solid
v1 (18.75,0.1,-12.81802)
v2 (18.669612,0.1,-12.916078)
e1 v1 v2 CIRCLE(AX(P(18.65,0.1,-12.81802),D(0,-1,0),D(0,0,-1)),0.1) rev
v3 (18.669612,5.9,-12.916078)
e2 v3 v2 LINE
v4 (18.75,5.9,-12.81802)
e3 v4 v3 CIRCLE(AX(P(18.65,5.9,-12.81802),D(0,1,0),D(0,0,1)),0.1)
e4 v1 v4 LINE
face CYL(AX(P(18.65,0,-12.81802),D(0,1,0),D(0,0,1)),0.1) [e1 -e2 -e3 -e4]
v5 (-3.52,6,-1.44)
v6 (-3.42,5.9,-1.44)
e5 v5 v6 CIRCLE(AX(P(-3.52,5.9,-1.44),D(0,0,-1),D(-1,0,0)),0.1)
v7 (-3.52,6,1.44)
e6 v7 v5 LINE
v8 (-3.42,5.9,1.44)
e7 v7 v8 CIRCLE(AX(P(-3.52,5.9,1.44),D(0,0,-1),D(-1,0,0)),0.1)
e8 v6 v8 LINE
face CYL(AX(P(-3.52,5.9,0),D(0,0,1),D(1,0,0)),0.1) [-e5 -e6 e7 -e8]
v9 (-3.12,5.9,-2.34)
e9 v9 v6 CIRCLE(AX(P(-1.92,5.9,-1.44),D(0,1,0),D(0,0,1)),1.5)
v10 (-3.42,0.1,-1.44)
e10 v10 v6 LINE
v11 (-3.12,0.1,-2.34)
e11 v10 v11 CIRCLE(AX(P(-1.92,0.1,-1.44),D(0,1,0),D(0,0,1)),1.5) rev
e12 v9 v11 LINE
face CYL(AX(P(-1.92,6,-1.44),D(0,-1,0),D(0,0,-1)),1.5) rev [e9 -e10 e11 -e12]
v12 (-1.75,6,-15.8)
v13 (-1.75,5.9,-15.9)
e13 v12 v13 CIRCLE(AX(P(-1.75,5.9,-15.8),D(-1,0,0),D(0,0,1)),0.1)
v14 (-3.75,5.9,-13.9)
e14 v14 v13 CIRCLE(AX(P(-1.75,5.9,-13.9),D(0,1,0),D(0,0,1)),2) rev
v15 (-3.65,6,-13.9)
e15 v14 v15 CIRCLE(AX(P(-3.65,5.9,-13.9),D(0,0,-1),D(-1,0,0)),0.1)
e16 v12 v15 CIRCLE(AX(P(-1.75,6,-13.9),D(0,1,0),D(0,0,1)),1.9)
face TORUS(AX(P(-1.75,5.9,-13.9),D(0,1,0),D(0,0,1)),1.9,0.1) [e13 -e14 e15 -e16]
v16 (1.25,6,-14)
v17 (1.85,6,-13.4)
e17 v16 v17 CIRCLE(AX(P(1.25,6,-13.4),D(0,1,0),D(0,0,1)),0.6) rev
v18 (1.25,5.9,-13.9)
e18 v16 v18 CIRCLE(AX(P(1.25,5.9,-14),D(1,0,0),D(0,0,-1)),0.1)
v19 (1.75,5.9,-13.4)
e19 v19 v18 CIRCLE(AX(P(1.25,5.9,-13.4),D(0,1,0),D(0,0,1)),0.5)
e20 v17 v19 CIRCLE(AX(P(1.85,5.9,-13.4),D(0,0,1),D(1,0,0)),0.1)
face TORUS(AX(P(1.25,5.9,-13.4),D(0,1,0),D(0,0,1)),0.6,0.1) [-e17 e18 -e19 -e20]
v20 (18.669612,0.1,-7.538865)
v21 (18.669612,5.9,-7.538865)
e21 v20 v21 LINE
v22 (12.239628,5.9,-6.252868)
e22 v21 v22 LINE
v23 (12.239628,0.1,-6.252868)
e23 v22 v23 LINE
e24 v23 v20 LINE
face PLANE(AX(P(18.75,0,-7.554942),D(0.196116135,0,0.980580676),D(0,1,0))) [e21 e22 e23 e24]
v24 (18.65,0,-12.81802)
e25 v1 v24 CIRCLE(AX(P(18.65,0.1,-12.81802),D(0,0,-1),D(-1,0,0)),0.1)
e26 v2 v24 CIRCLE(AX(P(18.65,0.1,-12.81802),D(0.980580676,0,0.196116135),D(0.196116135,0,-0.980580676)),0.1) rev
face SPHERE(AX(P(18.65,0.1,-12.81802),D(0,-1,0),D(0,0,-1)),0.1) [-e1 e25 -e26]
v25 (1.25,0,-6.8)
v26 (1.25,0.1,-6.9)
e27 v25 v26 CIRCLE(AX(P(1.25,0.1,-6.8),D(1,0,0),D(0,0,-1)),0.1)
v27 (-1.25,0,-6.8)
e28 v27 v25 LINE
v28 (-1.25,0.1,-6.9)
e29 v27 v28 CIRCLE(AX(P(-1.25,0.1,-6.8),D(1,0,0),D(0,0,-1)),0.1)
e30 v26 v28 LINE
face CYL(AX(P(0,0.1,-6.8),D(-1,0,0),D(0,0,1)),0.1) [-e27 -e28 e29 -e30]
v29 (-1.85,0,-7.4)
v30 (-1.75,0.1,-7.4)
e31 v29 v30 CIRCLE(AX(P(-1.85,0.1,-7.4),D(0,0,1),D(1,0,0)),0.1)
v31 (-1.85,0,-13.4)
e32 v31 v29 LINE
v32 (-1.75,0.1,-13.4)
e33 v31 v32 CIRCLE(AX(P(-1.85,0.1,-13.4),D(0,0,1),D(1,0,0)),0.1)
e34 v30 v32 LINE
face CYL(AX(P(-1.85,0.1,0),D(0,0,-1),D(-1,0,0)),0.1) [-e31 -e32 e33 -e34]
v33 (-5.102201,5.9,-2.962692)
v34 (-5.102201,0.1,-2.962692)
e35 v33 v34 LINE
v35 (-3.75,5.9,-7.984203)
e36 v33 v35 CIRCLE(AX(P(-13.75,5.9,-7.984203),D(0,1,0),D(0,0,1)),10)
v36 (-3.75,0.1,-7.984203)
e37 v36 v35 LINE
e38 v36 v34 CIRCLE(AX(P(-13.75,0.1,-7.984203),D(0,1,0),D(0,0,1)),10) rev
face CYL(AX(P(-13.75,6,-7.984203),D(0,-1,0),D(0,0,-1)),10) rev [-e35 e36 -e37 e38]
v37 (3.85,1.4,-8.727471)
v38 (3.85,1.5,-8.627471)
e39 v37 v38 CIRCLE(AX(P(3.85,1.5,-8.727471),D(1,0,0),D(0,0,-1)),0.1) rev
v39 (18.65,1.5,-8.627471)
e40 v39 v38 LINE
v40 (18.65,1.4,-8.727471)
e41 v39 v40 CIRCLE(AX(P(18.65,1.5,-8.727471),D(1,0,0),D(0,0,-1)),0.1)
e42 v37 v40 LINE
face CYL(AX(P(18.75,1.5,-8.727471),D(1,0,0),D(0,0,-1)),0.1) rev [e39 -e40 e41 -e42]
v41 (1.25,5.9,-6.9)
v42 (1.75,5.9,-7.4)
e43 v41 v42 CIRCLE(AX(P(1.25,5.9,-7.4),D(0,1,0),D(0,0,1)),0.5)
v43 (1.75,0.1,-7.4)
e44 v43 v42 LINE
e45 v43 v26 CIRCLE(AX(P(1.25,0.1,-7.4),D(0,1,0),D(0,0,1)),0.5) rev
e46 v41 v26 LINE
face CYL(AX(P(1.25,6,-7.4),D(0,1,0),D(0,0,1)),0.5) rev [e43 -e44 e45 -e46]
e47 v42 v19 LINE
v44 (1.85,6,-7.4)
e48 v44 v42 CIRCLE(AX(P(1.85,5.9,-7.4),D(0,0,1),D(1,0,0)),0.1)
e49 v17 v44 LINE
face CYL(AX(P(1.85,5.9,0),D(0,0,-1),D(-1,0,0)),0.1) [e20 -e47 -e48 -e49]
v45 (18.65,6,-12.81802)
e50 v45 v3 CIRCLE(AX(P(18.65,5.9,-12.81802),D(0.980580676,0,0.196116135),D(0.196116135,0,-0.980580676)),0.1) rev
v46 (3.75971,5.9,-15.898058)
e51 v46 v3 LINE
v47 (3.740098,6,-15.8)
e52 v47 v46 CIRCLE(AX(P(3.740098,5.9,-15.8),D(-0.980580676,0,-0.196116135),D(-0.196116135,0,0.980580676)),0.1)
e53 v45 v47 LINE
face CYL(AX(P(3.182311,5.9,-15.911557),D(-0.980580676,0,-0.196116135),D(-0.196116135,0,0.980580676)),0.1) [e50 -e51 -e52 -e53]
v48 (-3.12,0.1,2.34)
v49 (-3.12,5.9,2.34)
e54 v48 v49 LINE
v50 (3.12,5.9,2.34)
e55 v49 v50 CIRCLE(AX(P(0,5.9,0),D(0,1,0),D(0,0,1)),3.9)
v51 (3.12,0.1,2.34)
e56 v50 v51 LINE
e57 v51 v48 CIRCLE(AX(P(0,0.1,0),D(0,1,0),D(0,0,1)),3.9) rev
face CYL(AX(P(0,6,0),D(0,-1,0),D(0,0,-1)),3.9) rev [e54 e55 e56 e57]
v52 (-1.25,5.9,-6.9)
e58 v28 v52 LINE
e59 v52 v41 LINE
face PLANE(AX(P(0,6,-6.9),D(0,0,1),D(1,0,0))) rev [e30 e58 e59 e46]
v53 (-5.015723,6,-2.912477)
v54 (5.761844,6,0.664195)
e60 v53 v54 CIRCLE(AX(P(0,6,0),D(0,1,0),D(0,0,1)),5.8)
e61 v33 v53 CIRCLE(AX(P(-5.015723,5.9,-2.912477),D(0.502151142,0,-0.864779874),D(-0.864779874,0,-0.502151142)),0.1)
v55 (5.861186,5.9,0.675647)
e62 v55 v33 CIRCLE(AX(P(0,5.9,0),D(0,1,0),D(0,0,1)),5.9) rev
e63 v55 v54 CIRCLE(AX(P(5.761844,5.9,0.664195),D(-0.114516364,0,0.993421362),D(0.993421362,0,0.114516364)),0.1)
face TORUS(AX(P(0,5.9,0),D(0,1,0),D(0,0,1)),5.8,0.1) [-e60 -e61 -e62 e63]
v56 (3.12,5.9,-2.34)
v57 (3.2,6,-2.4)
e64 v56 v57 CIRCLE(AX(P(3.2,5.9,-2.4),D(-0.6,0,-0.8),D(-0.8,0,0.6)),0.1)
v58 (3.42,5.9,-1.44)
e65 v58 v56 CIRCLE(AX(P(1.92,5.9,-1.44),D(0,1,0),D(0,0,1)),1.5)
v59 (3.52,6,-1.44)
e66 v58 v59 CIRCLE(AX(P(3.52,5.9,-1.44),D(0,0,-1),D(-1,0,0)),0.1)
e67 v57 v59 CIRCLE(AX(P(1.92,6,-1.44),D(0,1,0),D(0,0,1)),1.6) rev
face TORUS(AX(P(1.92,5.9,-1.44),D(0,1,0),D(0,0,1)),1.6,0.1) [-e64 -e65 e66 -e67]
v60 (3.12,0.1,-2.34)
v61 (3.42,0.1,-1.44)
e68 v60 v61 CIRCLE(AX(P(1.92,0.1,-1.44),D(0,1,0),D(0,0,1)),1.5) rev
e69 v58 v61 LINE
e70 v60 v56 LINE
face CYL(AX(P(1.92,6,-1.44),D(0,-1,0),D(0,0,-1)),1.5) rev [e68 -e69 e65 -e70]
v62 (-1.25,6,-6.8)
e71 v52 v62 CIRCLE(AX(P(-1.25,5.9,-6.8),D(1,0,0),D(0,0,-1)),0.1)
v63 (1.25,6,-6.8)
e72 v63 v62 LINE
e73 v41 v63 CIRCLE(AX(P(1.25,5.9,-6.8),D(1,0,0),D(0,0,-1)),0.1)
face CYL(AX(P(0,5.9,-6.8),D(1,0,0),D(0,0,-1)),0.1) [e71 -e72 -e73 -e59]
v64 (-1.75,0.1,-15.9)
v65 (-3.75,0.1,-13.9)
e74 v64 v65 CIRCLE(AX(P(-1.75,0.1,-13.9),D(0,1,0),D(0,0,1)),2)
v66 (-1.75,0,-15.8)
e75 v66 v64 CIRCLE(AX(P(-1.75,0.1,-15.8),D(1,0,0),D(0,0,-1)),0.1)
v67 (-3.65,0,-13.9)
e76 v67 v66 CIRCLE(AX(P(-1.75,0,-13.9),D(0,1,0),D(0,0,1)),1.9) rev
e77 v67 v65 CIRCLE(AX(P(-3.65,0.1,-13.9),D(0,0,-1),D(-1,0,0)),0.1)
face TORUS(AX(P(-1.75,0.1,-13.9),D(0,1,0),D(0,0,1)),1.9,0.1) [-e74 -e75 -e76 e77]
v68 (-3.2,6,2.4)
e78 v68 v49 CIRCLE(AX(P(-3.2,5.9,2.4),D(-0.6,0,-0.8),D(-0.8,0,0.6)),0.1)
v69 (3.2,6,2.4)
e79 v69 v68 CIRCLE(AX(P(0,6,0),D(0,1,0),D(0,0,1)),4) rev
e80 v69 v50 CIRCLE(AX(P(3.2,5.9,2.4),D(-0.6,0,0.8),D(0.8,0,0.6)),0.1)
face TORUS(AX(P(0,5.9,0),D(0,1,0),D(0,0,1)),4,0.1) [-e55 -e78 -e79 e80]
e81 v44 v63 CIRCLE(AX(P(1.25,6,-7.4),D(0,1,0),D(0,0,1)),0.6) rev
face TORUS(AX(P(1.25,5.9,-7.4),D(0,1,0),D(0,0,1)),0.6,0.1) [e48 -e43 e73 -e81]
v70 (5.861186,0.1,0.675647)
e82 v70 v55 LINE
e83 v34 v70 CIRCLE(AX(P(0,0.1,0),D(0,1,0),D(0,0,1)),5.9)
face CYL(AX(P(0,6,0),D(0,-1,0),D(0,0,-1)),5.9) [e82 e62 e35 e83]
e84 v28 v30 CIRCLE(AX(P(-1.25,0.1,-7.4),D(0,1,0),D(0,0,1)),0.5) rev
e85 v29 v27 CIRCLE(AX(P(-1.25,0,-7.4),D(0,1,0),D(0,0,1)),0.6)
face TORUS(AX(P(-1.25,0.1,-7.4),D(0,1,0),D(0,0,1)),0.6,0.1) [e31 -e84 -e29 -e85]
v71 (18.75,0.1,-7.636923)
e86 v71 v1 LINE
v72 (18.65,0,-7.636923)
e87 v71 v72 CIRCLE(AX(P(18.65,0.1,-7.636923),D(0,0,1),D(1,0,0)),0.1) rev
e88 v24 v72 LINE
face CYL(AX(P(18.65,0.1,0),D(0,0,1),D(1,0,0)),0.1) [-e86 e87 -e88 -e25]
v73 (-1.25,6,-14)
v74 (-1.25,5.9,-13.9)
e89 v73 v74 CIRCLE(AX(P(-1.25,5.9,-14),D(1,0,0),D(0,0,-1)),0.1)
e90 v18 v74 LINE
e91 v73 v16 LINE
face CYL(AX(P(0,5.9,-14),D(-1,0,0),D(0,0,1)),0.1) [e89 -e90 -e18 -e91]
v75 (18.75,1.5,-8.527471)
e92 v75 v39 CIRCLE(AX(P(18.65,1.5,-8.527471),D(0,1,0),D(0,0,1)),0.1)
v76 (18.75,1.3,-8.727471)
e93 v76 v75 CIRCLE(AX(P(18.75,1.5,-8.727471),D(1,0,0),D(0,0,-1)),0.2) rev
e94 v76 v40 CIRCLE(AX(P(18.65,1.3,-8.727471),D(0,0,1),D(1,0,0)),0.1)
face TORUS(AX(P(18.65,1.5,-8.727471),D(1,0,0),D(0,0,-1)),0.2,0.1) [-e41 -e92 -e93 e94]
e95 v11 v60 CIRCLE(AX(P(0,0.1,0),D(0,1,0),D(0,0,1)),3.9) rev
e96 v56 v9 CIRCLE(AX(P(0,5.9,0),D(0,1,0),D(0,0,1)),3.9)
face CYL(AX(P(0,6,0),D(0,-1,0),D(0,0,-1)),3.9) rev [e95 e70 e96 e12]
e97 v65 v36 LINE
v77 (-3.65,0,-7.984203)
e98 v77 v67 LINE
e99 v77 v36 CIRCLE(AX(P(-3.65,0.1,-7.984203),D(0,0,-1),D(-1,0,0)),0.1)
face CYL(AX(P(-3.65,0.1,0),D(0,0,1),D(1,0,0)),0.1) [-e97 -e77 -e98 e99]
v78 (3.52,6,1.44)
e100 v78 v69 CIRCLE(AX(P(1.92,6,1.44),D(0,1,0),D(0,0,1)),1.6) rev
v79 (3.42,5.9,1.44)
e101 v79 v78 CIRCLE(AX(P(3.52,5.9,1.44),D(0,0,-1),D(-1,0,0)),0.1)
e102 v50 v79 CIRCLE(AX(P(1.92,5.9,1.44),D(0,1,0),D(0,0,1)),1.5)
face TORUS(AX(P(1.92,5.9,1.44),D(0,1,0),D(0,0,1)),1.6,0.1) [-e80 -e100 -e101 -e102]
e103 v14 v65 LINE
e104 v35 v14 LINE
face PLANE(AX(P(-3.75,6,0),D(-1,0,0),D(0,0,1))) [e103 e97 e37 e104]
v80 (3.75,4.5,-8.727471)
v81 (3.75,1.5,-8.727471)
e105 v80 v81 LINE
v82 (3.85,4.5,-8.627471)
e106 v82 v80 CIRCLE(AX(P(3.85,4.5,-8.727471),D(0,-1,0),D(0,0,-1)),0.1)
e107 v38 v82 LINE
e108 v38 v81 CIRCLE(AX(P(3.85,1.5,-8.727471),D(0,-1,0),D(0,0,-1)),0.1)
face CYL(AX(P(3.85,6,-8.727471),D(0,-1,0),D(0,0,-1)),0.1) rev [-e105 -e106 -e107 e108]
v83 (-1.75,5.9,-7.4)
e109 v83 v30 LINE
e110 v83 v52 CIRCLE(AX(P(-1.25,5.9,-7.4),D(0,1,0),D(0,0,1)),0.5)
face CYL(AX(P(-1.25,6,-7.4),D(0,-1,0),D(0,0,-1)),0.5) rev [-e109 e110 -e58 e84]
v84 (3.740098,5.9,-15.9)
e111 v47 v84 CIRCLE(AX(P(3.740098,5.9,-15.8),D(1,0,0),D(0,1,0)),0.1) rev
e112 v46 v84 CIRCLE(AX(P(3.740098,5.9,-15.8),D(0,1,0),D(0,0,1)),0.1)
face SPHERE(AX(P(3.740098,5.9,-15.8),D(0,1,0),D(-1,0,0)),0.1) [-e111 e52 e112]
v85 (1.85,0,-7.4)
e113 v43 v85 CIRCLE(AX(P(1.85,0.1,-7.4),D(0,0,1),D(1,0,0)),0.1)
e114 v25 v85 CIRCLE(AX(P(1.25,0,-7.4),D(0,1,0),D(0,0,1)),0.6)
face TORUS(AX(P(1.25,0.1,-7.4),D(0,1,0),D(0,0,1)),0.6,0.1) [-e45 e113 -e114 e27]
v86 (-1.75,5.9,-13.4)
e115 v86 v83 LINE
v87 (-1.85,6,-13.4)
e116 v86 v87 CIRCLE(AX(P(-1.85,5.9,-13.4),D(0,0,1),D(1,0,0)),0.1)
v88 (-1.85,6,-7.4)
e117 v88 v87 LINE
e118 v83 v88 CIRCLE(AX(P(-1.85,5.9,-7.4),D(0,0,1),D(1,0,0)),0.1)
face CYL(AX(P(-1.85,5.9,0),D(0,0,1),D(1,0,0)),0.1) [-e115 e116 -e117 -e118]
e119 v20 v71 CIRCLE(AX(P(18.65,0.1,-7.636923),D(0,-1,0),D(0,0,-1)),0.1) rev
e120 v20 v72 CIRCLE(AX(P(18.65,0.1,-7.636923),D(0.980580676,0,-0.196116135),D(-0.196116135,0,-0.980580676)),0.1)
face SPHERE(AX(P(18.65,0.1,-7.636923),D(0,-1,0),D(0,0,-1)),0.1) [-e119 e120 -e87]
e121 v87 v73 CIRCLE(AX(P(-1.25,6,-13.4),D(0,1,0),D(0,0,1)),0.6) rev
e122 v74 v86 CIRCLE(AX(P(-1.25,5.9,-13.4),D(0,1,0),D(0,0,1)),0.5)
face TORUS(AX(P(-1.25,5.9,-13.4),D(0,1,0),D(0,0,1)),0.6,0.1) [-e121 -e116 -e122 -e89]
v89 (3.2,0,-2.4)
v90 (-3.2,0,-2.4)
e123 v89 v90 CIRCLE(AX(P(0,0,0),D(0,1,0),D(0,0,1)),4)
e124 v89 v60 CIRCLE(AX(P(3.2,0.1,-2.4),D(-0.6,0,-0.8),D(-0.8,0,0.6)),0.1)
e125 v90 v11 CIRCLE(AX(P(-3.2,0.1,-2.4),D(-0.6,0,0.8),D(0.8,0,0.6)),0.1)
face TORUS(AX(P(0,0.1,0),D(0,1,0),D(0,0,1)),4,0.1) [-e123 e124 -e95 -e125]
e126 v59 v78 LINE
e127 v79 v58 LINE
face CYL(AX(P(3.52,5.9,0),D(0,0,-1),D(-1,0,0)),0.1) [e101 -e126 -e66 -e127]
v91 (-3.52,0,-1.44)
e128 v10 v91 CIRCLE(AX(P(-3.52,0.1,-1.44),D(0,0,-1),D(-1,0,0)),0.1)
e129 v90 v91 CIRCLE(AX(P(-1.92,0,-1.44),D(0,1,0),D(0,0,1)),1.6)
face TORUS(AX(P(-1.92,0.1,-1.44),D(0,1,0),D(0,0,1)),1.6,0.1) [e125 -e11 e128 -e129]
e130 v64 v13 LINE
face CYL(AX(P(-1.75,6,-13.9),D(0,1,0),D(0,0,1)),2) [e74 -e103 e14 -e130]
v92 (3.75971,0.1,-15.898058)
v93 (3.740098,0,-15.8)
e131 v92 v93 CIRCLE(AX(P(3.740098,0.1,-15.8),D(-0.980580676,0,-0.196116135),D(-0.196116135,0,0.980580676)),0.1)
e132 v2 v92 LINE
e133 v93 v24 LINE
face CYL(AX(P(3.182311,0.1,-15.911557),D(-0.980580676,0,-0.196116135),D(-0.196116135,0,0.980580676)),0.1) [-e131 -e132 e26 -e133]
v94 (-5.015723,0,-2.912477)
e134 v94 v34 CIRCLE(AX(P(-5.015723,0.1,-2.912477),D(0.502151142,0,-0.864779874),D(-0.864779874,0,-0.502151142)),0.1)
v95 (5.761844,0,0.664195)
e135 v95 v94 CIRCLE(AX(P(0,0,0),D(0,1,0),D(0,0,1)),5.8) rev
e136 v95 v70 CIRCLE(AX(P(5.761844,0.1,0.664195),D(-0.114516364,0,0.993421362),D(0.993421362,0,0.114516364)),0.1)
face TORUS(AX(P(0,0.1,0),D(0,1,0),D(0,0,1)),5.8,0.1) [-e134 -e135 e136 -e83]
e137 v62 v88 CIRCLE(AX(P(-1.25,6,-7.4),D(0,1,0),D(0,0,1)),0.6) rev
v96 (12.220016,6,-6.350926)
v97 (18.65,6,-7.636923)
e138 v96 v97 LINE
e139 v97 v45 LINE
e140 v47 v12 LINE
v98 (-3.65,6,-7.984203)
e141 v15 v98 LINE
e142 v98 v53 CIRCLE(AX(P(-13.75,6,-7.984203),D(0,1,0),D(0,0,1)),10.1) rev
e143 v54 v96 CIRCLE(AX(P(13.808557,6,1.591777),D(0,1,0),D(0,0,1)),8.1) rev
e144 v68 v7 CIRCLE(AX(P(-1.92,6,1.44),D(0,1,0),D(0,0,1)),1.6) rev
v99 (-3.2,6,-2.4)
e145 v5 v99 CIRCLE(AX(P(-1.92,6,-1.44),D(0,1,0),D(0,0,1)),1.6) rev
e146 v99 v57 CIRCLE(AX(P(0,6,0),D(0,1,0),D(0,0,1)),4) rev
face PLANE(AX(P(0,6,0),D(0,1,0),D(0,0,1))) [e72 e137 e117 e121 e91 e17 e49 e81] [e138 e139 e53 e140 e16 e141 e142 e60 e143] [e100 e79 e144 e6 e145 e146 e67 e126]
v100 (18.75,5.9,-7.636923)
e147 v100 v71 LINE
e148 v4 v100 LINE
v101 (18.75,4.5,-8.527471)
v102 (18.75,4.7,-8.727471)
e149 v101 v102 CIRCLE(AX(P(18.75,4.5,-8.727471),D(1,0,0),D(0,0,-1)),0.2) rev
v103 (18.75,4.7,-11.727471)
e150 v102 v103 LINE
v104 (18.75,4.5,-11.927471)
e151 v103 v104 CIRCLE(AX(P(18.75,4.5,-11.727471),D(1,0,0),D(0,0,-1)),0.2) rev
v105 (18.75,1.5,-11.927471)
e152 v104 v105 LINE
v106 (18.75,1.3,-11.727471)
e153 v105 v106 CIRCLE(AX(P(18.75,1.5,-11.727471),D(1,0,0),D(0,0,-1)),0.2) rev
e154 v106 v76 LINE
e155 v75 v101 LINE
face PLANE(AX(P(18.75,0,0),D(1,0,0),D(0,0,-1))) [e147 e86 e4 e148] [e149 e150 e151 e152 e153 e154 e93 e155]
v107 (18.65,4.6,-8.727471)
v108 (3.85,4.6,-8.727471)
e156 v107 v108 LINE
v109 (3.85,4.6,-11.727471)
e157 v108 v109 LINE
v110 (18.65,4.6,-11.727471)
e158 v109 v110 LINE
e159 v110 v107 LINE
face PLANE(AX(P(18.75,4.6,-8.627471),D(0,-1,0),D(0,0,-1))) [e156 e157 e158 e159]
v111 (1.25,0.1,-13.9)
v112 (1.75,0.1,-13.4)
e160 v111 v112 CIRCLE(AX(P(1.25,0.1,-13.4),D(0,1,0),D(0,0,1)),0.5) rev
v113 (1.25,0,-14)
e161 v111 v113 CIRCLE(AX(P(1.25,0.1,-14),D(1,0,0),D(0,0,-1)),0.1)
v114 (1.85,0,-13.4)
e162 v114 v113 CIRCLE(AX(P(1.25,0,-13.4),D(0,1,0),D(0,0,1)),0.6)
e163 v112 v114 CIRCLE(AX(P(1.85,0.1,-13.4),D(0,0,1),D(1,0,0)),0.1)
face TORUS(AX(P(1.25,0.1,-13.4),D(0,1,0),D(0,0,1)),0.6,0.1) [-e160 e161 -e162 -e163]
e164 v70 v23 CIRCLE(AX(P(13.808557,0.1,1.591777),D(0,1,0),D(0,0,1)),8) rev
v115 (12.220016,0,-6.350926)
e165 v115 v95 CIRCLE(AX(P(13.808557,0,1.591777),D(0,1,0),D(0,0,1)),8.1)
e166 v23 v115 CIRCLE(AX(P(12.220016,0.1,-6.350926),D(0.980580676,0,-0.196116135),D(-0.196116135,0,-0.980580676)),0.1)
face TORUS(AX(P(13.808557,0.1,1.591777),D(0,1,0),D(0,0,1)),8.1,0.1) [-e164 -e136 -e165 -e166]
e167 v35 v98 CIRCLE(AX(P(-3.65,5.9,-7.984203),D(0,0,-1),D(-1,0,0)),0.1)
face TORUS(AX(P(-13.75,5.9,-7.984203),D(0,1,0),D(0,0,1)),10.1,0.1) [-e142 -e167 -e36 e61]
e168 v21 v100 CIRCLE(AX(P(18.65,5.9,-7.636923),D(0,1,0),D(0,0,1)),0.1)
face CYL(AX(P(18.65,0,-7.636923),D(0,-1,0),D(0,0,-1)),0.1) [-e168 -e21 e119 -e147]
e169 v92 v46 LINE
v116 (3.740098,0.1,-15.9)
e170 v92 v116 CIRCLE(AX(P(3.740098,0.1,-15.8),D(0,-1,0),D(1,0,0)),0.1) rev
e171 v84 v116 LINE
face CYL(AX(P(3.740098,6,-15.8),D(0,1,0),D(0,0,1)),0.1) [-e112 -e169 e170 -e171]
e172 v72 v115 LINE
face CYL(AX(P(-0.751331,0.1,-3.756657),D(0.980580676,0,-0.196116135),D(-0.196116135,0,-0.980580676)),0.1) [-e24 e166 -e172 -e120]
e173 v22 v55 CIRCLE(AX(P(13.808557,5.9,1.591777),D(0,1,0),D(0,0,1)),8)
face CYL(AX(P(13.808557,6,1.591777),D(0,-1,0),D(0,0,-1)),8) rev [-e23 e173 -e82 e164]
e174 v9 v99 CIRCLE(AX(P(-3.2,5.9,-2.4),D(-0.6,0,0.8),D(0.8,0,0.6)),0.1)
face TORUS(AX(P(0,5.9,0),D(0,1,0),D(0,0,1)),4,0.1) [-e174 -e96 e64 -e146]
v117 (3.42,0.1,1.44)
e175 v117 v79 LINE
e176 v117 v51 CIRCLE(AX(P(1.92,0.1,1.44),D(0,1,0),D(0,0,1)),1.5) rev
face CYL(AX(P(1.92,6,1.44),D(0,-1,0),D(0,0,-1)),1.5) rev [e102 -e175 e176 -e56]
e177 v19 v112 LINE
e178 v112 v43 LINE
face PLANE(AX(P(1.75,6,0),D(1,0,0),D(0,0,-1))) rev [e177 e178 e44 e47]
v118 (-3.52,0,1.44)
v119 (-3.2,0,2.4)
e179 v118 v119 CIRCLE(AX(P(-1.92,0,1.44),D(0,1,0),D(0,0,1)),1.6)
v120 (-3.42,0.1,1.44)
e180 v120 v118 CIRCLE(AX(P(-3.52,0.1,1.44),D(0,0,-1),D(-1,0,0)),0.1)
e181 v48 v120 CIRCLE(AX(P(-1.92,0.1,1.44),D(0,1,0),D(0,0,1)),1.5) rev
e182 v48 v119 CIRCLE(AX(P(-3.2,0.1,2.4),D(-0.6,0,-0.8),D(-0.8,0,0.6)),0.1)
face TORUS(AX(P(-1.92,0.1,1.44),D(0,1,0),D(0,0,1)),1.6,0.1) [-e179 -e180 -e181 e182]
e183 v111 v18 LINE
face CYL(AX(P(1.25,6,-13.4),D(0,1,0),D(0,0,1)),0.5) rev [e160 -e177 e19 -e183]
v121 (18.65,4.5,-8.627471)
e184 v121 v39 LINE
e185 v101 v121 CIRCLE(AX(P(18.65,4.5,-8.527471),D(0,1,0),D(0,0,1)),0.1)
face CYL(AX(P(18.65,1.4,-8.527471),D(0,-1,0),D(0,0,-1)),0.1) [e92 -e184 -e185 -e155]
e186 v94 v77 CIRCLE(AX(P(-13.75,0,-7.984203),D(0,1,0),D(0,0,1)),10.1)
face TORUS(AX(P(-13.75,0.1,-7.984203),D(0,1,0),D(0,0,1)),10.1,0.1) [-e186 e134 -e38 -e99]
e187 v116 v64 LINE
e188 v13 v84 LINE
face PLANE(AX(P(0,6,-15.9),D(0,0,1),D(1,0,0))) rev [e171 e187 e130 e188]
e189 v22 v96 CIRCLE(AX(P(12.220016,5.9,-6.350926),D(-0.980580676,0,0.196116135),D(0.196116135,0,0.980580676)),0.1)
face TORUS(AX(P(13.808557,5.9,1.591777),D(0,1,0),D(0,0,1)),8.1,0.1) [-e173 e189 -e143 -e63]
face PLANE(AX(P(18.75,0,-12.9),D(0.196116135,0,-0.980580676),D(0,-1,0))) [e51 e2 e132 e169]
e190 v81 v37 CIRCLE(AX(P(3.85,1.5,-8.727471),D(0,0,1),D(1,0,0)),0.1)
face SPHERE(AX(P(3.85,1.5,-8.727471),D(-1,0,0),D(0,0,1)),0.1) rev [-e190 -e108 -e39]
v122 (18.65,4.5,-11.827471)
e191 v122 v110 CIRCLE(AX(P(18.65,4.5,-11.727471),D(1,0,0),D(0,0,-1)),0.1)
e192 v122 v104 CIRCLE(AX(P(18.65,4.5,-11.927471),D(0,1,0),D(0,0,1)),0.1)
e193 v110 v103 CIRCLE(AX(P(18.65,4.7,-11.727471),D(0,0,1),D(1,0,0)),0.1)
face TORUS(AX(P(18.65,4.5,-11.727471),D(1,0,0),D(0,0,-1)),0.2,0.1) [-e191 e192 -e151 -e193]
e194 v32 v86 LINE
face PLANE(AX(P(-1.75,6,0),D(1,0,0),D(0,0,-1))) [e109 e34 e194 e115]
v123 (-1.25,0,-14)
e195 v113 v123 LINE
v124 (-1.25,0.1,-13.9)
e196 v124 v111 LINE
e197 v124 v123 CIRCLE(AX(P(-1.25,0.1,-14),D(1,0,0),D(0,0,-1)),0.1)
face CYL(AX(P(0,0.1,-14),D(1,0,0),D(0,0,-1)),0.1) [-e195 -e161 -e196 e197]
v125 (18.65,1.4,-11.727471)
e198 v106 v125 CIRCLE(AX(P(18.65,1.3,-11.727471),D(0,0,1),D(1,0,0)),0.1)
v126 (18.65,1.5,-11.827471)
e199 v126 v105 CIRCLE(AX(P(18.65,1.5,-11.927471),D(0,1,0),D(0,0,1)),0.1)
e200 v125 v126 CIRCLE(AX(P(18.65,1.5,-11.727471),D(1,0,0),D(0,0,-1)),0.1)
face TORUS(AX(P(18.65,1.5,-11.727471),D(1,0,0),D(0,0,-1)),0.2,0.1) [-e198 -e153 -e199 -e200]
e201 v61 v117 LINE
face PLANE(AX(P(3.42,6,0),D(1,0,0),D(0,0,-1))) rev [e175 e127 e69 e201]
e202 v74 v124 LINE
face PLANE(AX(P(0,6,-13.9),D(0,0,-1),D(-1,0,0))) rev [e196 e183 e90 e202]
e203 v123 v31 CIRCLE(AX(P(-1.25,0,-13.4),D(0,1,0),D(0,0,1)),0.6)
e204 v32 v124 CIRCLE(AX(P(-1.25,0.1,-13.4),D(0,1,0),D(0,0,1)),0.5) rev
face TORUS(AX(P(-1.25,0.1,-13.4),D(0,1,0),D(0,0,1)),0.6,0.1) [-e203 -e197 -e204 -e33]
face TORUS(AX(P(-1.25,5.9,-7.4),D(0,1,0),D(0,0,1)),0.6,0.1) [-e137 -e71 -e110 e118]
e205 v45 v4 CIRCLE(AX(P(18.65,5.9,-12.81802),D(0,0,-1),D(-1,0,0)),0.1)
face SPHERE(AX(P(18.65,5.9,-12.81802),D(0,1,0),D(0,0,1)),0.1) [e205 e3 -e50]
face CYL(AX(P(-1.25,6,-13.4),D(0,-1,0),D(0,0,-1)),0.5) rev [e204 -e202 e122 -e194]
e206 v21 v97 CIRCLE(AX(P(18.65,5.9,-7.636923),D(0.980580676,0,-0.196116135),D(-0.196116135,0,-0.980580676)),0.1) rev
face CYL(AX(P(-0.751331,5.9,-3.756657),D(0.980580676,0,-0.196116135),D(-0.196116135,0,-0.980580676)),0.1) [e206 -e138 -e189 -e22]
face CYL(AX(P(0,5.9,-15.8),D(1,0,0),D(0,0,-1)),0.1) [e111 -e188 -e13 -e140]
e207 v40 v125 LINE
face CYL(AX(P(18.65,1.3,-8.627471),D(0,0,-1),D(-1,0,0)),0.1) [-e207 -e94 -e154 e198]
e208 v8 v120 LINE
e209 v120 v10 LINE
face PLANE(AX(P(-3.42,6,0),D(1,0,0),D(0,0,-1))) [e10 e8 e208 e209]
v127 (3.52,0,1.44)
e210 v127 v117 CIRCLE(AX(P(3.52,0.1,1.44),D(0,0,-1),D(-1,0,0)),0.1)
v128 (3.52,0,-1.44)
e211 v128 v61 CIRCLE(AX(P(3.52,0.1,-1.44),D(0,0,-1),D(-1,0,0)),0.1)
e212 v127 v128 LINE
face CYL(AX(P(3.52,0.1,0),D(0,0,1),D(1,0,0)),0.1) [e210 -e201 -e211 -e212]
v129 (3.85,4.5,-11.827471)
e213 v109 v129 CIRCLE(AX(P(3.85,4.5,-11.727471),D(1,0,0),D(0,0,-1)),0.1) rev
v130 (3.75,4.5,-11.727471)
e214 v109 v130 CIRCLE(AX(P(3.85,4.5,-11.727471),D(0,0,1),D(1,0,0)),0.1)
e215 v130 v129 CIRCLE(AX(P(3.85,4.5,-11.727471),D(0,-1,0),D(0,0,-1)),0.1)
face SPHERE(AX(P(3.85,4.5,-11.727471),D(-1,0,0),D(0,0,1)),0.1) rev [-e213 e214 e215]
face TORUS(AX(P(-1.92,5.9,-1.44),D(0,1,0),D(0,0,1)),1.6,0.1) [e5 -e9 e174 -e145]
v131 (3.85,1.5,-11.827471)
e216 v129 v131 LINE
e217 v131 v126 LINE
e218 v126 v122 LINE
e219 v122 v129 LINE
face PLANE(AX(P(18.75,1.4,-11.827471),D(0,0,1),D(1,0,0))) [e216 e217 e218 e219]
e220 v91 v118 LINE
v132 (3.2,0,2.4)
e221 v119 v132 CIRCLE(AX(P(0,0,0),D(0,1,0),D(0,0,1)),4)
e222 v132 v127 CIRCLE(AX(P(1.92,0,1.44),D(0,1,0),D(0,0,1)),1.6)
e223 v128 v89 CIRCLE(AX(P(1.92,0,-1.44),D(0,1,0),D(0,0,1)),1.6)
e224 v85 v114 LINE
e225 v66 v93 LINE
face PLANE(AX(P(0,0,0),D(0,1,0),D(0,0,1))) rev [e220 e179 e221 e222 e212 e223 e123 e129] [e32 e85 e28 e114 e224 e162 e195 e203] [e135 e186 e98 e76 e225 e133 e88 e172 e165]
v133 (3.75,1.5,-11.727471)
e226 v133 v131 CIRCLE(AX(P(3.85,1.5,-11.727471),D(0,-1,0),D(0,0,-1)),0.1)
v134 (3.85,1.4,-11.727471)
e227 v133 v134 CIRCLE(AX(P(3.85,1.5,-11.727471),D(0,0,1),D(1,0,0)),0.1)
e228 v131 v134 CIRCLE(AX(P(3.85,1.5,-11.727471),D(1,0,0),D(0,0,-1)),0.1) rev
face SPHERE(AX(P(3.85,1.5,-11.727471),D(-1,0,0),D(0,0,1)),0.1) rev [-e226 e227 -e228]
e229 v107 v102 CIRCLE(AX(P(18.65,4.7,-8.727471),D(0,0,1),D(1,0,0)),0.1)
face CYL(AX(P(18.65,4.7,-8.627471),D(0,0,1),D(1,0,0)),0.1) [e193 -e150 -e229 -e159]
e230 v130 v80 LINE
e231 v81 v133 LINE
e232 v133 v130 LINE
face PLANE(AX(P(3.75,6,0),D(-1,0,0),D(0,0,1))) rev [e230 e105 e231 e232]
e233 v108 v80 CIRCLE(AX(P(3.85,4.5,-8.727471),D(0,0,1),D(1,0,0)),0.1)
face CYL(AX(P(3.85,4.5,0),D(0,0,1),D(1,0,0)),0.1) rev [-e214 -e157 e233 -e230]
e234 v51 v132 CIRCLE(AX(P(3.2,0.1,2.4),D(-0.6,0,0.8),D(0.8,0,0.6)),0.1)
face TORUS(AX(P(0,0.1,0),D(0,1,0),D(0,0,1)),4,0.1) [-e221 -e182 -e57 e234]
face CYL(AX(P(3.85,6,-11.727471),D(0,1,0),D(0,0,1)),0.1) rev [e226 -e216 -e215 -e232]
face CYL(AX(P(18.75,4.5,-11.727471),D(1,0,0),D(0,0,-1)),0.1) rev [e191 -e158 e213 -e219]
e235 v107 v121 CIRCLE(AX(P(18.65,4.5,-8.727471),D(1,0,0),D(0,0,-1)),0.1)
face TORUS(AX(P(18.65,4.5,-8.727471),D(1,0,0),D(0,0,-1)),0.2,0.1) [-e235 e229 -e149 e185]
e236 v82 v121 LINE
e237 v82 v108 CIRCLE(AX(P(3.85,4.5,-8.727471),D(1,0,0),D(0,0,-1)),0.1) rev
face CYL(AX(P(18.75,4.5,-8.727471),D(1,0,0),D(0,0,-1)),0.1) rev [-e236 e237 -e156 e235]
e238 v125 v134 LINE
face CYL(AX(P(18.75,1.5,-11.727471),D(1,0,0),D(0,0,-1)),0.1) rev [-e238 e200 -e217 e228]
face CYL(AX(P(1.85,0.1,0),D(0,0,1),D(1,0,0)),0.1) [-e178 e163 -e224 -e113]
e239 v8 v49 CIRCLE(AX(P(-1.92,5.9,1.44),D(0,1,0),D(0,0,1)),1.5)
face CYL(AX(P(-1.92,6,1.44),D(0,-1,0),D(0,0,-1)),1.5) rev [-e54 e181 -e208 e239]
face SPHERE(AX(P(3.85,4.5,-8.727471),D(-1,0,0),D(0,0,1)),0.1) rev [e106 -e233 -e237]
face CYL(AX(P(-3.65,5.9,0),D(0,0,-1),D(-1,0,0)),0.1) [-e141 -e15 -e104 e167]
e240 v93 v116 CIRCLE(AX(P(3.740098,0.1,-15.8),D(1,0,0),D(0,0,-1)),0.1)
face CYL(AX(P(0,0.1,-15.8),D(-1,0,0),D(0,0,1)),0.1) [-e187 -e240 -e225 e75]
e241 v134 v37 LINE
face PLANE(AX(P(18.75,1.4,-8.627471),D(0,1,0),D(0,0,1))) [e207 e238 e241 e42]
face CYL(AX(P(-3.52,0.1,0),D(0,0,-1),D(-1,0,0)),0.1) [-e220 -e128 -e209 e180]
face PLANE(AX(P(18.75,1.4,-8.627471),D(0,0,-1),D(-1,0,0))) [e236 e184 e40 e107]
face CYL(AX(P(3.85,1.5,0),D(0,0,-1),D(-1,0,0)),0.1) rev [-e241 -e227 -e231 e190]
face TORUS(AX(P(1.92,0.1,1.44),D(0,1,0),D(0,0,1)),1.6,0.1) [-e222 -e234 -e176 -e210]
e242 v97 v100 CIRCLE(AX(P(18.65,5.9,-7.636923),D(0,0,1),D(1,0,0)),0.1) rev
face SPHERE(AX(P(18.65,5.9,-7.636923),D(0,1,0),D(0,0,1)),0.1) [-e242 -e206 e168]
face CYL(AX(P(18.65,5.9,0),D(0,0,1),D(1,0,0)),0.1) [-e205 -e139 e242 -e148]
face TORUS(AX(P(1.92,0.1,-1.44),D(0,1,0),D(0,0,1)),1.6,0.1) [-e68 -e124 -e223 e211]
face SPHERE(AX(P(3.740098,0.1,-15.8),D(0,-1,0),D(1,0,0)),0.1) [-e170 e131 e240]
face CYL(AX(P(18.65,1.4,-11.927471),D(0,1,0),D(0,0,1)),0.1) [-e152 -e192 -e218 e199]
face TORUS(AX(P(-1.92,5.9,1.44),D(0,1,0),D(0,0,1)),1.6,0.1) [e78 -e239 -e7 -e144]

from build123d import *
from OCP.BRepFilletAPI import BRepFilletAPI_MakeChamfer

# Parameters (mm, degrees)
ESQUISSE1_R        = 5.9
ESQUISSE1_R_2      = 3.9
BOSS_EXTRU_1_DEPTH = 6
ESQUISSE3_W        = 11.345057629
ESQUISSE3_H        = 6
ESQUISSE3_W_2      = 3.2
ESQUISSE3_H_2      = 3.2
BOSS_EXTRU_2_DEPTH = 15
CHANFREIN1_SIZE    = 3
CHANFREIN1_SIZE_2  = 15
CONG_1_DEPTH       = 6
CONG_2_R           = 10
CONG_3_R           = 2
CONG_4_R           = 1.5
CONG_5_R           = 0.5
CONG_6_R           = 0.1
CONG_7_R           = 0.1


with BuildPart() as part:
    # Esquisse1 → Boss.-Extru.1 (new body)
    # profile 1 of 5: a face of its own
    with BuildSketch(Plane(origin=(0, 0, 0), x_dir=(1, 0, 0), z_dir=(0, 1, 0))):
        Circle(ESQUISSE1_R)
        Circle(ESQUISSE1_R_2, mode=Mode.SUBTRACT)
    # profile 2 of 5: a face of its own
    with BuildSketch(Plane(origin=(0, 0, 0), x_dir=(1, 0, 0), z_dir=(0, 1, 0))):
        with BuildLine():
            Line((-3.75, 12.9), (-3.75, 4.554942371))
            ThreePointArc((-3.75, 4.554942371), (0, 5.9), (3.75, 4.554942371))
            Line((3.75, 4.554942371), (3.75, 12.9))
            Line((3.75, 12.9), (3.75, 15.9))
            Line((3.75, 15.9), (0, 15.9))
            Line((0, 15.9), (-3.75, 15.9))
            Line((-3.75, 15.9), (-3.75, 12.9))
        make_face()
        Polygon((-1.75, 13.9), (0, 13.9), (1.75, 13.9), (1.75, 6.9), (-1.75, 6.9), align=None, mode=Mode.SUBTRACT)
    # profile 3 of 5: a face of its own
    with BuildSketch(Plane(origin=(0, 0, 0), x_dir=(1, 0, 0), z_dir=(0, 1, 0))):
        with BuildLine():
            ThreePointArc((3.75, 4.554942371), (0, 5.9), (-3.75, 4.554942371))
            ThreePointArc((-3.75, 4.554942371), (-2.518432052, -5.335494354), (5.9, 0))
            ThreePointArc((5.9, 0), (5.335494354, 2.518432052), (3.75, 4.554942371))
        make_face()
        with BuildLine():
            ThreePointArc((-3.42, 1.874459922), (0, 3.9), (3.42, 1.874459922))
            ThreePointArc((3.42, 1.874459922), (3.778094758, 0.96747093), (3.9, 0))
            ThreePointArc((3.9, 0), (3.778094758, -0.96747093), (3.42, -1.874459922))
            ThreePointArc((3.42, -1.874459922), (0, -3.9), (-3.42, -1.874459922))
            ThreePointArc((-3.42, -1.874459922), (-3.9, 0), (-3.42, 1.874459922))
        make_face(mode=Mode.SUBTRACT)
    # profile 4 of 5: a face of its own
    with BuildSketch(Plane(origin=(0, 0, 0), x_dir=(1, 0, 0), z_dir=(0, 1, 0))):
        with BuildLine():
            ThreePointArc((3.9, 0), (3.778094758, 0.96747093), (3.42, 1.874459922))
            Line((3.42, 1.874459922), (3.42, -1.874459922))
            ThreePointArc((3.42, -1.874459922), (3.778094758, -0.96747093), (3.9, 0))
        make_face()
    # profile 5 of 5: a face of its own
    with BuildSketch(Plane(origin=(0, 0, 0), x_dir=(1, 0, 0), z_dir=(0, 1, 0))):
        with BuildLine():
            Line((-3.42, -1.874459922), (-3.42, 1.874459922))
            ThreePointArc((-3.42, 1.874459922), (-3.9, 0), (-3.42, -1.874459922))
        make_face()
    extrude(amount=BOSS_EXTRU_1_DEPTH)

    # Esquisse3 → Boss.-Extru.2 (add)
    with BuildSketch(Plane(origin=(3.75, 0, 0), x_dir=(0, 0, -1), z_dir=(1, 0, 0))):
        with Locations((10.227471186, 3)):
            Rectangle(ESQUISSE3_W, ESQUISSE3_H)
        with Locations((10.227471185, 3)):
            Rectangle(ESQUISSE3_W_2, ESQUISSE3_H_2, mode=Mode.SUBTRACT)
    extrude(amount=BOSS_EXTRU_2_DEPTH)

    # Chanfrein1
    chanfrein1_edges_1 = [part.edges().sort_by_distance(p)[0] for p in [
        (18.75, 3, -15.9),
    ]]
    chanfrein1_side_1 = [part.faces().sort_by_distance(p)[0] for p in [
        (18.75, 3, -15.84),
    ]]
    chanfrein1_edges_2 = [part.edges().sort_by_distance(p)[0] for p in [
        (18.75, 3, -4.554942371),
    ]]
    chanfrein1_side_2 = [part.faces().sort_by_distance(p)[0] for p in [
        (18.69, 3, -4.554942371),
    ]]
    chanfrein1 = BRepFilletAPI_MakeChamfer(part.part.solid().wrapped)
    for e in chanfrein1_edges_1:
        chanfrein1.Add(CHANFREIN1_SIZE - 0.0001, CHANFREIN1_SIZE_2 - 0.0001, e.wrapped, chanfrein1_side_1[0].wrapped)
    for e in chanfrein1_edges_2:
        chanfrein1.Add(CHANFREIN1_SIZE_2 - 0.0001, CHANFREIN1_SIZE - 0.0001, e.wrapped, chanfrein1_side_2[0].wrapped)
    add(Compound.cast(chanfrein1.Shape()), mode=Mode.REPLACE)  # a hair under: the kernel refuses the full size

    # Congé1: read off the stored shape, not the designer's step
    # Congé1 outline → Congé1 (add)
    with BuildSketch(Plane(origin=(0, 0, 0), x_dir=(1, 0, 0), z_dir=(0, 1, 0))):
        with BuildLine():
            ThreePointArc((3.75, 4.554942371), (5.471150644, 2.208282282), (5.861186035, -0.67564655))
            ThreePointArc((5.861186035, -0.67564655), (7.92289048, 3.826610711), (12.239627849, 6.252867941))
            Line((12.239627849, 6.252867941), (3.75, 4.554942371))
        make_face()
    extrude(amount=CONG_1_DEPTH)

    # Congé2
    cong_2_edges = [part.edges().sort_by_distance(p)[0] for p in [
        (-3.75, 3, -4.554942371),
    ]]
    fillet(cong_2_edges, radius=CONG_2_R)

    # Congé3
    cong_3_edges = [part.edges().sort_by_distance(p)[0] for p in [
        (-3.75, 3, -15.9),
    ]]
    fillet(cong_3_edges, radius=CONG_3_R)

    # Congé4
    cong_4_edges = [part.edges().sort_by_distance(p)[0] for p in [
        (3.42, 3, 1.874459922),
        (3.42, 3, -1.874459922),
        (-3.42, 3, -1.874459922),
        (-3.42, 3, 1.874459922),
    ]]
    fillet(cong_4_edges, radius=CONG_4_R)

    # Congé5
    cong_5_edges = [part.edges().sort_by_distance(p)[0] for p in [
        (-1.75, 3, -6.9),
        (1.75, 3, -6.9),
        (1.75, 3, -13.9),
        (-1.75, 3, -13.9),
    ]]
    fillet(cong_5_edges, radius=CONG_5_R)

    # Congé6
    cong_6_edges = [part.edges().sort_by_distance(p)[0] for p in [
        (11.25, 4.6, -11.827471185),
        (11.25, 4.6, -8.627471185),
        (11.25, 1.4, -8.627471185),
        (11.25, 1.4, -11.827471185),
    ]]
    fillet(cong_6_edges, radius=CONG_6_R)

    # Congé7
    cong_7_edges = [part.edges().sort_by_distance(p)[0] for p in [
        (-3.164213562, 0, -15.314213562),
        (-3.164213562, 6, -15.314213562),
        (0, 0, 3.9),
        (0, 6, 3.9),
        (3.42, 0, 0),
        (3.42, 6, 0),
        (0, 0, -3.9),
        (0, 6, -3.9),
        (-3.42, 0, 0),
        (-3.42, 6, 0),
        (3.343024947, 0, 1.914341649),
        (3.343024947, 6, 1.914341649),
        (3.343024947, 0, -1.914341649),
        (3.343024947, 6, -1.914341649),
        (-3.343024947, 0, 1.914341649),
        (-3.343024947, 6, 1.914341649),
        (-3.343024947, 0, -1.914341649),
        (-3.343024947, 6, -1.914341649),
        (0, 0, -13.9),
        (0, 6, -13.9),
        (-1.75, 0, -10.4),
        (-1.75, 6, -10.4),
        (1.75, 0, -10.4),
        (1.75, 6, -10.4),
        (0, 0, -6.9),
        (0, 6, -6.9),
        (-1.603553391, 0, -13.753553391),
        (-1.603553391, 6, -13.753553391),
        (1.603553391, 0, -13.753553391),
        (1.603553391, 6, -13.753553391),
        (-1.603553391, 0, -7.046446609),
        (-1.603553391, 6, -7.046446609),
        (1.603553391, 0, -7.046446609),
        (1.603553391, 6, -7.046446609),
        (3.75, 3, -11.827471185),
        (18.75, 3, -11.827471185),
        (3.75, 1.4, -10.227471185),
        (3.75, 4.6, -10.227471185),
        (3.75, 3, -8.627471185),
        (3.75, 4.570710678, -8.656760507),
        (3.75, 1.429289322, -8.656760507),
        (3.75, 1.429289322, -11.798181863),
        (3.75, 4.570710678, -11.798181863),
        (18.75, 4.6, -10.227471185),
        (18.75, 1.4, -10.227471185),
        (18.75, 3, -8.627471185),
        (18.75, 4.570710678, -11.798181863),
        (18.75, 1.429289322, -11.798181863),
        (18.75, 1.429289322, -8.656760507),
        (18.75, 4.570710678, -8.656760507),
        (18.75, 0, -10.227471185),
        (18.75, 6, -10.227471185),
        (18.75, 3, -7.554842371),
        (18.75, 3, -12.9001),
        (1.00005, 6, -15.9),
        (11.25005, 6, -14.40005),
        (1.00005, 0, -15.9),
        (3.7501, 3, -15.9),
        (15.479149713, 0, -6.900689758),
        (11.25005, 0, -14.40005),
        (15.479149713, 6, -6.900689758),
        (7.912078424, 0, -3.814842663),
        (7.912078424, 6, -3.814842663),
        (-1.858330123, 0, 5.599697238),
        (-1.858330123, 6, 5.599697238),
        (-3.75, 0, -10.942101577),
        (-3.75, 6, -10.942101577),
        (-4.093965943, 0, -5.384009644),
        (-4.093965943, 6, -5.384009644),
    ]]
    fillet(cong_7_edges, radius=CONG_7_R)


solid = part.part
